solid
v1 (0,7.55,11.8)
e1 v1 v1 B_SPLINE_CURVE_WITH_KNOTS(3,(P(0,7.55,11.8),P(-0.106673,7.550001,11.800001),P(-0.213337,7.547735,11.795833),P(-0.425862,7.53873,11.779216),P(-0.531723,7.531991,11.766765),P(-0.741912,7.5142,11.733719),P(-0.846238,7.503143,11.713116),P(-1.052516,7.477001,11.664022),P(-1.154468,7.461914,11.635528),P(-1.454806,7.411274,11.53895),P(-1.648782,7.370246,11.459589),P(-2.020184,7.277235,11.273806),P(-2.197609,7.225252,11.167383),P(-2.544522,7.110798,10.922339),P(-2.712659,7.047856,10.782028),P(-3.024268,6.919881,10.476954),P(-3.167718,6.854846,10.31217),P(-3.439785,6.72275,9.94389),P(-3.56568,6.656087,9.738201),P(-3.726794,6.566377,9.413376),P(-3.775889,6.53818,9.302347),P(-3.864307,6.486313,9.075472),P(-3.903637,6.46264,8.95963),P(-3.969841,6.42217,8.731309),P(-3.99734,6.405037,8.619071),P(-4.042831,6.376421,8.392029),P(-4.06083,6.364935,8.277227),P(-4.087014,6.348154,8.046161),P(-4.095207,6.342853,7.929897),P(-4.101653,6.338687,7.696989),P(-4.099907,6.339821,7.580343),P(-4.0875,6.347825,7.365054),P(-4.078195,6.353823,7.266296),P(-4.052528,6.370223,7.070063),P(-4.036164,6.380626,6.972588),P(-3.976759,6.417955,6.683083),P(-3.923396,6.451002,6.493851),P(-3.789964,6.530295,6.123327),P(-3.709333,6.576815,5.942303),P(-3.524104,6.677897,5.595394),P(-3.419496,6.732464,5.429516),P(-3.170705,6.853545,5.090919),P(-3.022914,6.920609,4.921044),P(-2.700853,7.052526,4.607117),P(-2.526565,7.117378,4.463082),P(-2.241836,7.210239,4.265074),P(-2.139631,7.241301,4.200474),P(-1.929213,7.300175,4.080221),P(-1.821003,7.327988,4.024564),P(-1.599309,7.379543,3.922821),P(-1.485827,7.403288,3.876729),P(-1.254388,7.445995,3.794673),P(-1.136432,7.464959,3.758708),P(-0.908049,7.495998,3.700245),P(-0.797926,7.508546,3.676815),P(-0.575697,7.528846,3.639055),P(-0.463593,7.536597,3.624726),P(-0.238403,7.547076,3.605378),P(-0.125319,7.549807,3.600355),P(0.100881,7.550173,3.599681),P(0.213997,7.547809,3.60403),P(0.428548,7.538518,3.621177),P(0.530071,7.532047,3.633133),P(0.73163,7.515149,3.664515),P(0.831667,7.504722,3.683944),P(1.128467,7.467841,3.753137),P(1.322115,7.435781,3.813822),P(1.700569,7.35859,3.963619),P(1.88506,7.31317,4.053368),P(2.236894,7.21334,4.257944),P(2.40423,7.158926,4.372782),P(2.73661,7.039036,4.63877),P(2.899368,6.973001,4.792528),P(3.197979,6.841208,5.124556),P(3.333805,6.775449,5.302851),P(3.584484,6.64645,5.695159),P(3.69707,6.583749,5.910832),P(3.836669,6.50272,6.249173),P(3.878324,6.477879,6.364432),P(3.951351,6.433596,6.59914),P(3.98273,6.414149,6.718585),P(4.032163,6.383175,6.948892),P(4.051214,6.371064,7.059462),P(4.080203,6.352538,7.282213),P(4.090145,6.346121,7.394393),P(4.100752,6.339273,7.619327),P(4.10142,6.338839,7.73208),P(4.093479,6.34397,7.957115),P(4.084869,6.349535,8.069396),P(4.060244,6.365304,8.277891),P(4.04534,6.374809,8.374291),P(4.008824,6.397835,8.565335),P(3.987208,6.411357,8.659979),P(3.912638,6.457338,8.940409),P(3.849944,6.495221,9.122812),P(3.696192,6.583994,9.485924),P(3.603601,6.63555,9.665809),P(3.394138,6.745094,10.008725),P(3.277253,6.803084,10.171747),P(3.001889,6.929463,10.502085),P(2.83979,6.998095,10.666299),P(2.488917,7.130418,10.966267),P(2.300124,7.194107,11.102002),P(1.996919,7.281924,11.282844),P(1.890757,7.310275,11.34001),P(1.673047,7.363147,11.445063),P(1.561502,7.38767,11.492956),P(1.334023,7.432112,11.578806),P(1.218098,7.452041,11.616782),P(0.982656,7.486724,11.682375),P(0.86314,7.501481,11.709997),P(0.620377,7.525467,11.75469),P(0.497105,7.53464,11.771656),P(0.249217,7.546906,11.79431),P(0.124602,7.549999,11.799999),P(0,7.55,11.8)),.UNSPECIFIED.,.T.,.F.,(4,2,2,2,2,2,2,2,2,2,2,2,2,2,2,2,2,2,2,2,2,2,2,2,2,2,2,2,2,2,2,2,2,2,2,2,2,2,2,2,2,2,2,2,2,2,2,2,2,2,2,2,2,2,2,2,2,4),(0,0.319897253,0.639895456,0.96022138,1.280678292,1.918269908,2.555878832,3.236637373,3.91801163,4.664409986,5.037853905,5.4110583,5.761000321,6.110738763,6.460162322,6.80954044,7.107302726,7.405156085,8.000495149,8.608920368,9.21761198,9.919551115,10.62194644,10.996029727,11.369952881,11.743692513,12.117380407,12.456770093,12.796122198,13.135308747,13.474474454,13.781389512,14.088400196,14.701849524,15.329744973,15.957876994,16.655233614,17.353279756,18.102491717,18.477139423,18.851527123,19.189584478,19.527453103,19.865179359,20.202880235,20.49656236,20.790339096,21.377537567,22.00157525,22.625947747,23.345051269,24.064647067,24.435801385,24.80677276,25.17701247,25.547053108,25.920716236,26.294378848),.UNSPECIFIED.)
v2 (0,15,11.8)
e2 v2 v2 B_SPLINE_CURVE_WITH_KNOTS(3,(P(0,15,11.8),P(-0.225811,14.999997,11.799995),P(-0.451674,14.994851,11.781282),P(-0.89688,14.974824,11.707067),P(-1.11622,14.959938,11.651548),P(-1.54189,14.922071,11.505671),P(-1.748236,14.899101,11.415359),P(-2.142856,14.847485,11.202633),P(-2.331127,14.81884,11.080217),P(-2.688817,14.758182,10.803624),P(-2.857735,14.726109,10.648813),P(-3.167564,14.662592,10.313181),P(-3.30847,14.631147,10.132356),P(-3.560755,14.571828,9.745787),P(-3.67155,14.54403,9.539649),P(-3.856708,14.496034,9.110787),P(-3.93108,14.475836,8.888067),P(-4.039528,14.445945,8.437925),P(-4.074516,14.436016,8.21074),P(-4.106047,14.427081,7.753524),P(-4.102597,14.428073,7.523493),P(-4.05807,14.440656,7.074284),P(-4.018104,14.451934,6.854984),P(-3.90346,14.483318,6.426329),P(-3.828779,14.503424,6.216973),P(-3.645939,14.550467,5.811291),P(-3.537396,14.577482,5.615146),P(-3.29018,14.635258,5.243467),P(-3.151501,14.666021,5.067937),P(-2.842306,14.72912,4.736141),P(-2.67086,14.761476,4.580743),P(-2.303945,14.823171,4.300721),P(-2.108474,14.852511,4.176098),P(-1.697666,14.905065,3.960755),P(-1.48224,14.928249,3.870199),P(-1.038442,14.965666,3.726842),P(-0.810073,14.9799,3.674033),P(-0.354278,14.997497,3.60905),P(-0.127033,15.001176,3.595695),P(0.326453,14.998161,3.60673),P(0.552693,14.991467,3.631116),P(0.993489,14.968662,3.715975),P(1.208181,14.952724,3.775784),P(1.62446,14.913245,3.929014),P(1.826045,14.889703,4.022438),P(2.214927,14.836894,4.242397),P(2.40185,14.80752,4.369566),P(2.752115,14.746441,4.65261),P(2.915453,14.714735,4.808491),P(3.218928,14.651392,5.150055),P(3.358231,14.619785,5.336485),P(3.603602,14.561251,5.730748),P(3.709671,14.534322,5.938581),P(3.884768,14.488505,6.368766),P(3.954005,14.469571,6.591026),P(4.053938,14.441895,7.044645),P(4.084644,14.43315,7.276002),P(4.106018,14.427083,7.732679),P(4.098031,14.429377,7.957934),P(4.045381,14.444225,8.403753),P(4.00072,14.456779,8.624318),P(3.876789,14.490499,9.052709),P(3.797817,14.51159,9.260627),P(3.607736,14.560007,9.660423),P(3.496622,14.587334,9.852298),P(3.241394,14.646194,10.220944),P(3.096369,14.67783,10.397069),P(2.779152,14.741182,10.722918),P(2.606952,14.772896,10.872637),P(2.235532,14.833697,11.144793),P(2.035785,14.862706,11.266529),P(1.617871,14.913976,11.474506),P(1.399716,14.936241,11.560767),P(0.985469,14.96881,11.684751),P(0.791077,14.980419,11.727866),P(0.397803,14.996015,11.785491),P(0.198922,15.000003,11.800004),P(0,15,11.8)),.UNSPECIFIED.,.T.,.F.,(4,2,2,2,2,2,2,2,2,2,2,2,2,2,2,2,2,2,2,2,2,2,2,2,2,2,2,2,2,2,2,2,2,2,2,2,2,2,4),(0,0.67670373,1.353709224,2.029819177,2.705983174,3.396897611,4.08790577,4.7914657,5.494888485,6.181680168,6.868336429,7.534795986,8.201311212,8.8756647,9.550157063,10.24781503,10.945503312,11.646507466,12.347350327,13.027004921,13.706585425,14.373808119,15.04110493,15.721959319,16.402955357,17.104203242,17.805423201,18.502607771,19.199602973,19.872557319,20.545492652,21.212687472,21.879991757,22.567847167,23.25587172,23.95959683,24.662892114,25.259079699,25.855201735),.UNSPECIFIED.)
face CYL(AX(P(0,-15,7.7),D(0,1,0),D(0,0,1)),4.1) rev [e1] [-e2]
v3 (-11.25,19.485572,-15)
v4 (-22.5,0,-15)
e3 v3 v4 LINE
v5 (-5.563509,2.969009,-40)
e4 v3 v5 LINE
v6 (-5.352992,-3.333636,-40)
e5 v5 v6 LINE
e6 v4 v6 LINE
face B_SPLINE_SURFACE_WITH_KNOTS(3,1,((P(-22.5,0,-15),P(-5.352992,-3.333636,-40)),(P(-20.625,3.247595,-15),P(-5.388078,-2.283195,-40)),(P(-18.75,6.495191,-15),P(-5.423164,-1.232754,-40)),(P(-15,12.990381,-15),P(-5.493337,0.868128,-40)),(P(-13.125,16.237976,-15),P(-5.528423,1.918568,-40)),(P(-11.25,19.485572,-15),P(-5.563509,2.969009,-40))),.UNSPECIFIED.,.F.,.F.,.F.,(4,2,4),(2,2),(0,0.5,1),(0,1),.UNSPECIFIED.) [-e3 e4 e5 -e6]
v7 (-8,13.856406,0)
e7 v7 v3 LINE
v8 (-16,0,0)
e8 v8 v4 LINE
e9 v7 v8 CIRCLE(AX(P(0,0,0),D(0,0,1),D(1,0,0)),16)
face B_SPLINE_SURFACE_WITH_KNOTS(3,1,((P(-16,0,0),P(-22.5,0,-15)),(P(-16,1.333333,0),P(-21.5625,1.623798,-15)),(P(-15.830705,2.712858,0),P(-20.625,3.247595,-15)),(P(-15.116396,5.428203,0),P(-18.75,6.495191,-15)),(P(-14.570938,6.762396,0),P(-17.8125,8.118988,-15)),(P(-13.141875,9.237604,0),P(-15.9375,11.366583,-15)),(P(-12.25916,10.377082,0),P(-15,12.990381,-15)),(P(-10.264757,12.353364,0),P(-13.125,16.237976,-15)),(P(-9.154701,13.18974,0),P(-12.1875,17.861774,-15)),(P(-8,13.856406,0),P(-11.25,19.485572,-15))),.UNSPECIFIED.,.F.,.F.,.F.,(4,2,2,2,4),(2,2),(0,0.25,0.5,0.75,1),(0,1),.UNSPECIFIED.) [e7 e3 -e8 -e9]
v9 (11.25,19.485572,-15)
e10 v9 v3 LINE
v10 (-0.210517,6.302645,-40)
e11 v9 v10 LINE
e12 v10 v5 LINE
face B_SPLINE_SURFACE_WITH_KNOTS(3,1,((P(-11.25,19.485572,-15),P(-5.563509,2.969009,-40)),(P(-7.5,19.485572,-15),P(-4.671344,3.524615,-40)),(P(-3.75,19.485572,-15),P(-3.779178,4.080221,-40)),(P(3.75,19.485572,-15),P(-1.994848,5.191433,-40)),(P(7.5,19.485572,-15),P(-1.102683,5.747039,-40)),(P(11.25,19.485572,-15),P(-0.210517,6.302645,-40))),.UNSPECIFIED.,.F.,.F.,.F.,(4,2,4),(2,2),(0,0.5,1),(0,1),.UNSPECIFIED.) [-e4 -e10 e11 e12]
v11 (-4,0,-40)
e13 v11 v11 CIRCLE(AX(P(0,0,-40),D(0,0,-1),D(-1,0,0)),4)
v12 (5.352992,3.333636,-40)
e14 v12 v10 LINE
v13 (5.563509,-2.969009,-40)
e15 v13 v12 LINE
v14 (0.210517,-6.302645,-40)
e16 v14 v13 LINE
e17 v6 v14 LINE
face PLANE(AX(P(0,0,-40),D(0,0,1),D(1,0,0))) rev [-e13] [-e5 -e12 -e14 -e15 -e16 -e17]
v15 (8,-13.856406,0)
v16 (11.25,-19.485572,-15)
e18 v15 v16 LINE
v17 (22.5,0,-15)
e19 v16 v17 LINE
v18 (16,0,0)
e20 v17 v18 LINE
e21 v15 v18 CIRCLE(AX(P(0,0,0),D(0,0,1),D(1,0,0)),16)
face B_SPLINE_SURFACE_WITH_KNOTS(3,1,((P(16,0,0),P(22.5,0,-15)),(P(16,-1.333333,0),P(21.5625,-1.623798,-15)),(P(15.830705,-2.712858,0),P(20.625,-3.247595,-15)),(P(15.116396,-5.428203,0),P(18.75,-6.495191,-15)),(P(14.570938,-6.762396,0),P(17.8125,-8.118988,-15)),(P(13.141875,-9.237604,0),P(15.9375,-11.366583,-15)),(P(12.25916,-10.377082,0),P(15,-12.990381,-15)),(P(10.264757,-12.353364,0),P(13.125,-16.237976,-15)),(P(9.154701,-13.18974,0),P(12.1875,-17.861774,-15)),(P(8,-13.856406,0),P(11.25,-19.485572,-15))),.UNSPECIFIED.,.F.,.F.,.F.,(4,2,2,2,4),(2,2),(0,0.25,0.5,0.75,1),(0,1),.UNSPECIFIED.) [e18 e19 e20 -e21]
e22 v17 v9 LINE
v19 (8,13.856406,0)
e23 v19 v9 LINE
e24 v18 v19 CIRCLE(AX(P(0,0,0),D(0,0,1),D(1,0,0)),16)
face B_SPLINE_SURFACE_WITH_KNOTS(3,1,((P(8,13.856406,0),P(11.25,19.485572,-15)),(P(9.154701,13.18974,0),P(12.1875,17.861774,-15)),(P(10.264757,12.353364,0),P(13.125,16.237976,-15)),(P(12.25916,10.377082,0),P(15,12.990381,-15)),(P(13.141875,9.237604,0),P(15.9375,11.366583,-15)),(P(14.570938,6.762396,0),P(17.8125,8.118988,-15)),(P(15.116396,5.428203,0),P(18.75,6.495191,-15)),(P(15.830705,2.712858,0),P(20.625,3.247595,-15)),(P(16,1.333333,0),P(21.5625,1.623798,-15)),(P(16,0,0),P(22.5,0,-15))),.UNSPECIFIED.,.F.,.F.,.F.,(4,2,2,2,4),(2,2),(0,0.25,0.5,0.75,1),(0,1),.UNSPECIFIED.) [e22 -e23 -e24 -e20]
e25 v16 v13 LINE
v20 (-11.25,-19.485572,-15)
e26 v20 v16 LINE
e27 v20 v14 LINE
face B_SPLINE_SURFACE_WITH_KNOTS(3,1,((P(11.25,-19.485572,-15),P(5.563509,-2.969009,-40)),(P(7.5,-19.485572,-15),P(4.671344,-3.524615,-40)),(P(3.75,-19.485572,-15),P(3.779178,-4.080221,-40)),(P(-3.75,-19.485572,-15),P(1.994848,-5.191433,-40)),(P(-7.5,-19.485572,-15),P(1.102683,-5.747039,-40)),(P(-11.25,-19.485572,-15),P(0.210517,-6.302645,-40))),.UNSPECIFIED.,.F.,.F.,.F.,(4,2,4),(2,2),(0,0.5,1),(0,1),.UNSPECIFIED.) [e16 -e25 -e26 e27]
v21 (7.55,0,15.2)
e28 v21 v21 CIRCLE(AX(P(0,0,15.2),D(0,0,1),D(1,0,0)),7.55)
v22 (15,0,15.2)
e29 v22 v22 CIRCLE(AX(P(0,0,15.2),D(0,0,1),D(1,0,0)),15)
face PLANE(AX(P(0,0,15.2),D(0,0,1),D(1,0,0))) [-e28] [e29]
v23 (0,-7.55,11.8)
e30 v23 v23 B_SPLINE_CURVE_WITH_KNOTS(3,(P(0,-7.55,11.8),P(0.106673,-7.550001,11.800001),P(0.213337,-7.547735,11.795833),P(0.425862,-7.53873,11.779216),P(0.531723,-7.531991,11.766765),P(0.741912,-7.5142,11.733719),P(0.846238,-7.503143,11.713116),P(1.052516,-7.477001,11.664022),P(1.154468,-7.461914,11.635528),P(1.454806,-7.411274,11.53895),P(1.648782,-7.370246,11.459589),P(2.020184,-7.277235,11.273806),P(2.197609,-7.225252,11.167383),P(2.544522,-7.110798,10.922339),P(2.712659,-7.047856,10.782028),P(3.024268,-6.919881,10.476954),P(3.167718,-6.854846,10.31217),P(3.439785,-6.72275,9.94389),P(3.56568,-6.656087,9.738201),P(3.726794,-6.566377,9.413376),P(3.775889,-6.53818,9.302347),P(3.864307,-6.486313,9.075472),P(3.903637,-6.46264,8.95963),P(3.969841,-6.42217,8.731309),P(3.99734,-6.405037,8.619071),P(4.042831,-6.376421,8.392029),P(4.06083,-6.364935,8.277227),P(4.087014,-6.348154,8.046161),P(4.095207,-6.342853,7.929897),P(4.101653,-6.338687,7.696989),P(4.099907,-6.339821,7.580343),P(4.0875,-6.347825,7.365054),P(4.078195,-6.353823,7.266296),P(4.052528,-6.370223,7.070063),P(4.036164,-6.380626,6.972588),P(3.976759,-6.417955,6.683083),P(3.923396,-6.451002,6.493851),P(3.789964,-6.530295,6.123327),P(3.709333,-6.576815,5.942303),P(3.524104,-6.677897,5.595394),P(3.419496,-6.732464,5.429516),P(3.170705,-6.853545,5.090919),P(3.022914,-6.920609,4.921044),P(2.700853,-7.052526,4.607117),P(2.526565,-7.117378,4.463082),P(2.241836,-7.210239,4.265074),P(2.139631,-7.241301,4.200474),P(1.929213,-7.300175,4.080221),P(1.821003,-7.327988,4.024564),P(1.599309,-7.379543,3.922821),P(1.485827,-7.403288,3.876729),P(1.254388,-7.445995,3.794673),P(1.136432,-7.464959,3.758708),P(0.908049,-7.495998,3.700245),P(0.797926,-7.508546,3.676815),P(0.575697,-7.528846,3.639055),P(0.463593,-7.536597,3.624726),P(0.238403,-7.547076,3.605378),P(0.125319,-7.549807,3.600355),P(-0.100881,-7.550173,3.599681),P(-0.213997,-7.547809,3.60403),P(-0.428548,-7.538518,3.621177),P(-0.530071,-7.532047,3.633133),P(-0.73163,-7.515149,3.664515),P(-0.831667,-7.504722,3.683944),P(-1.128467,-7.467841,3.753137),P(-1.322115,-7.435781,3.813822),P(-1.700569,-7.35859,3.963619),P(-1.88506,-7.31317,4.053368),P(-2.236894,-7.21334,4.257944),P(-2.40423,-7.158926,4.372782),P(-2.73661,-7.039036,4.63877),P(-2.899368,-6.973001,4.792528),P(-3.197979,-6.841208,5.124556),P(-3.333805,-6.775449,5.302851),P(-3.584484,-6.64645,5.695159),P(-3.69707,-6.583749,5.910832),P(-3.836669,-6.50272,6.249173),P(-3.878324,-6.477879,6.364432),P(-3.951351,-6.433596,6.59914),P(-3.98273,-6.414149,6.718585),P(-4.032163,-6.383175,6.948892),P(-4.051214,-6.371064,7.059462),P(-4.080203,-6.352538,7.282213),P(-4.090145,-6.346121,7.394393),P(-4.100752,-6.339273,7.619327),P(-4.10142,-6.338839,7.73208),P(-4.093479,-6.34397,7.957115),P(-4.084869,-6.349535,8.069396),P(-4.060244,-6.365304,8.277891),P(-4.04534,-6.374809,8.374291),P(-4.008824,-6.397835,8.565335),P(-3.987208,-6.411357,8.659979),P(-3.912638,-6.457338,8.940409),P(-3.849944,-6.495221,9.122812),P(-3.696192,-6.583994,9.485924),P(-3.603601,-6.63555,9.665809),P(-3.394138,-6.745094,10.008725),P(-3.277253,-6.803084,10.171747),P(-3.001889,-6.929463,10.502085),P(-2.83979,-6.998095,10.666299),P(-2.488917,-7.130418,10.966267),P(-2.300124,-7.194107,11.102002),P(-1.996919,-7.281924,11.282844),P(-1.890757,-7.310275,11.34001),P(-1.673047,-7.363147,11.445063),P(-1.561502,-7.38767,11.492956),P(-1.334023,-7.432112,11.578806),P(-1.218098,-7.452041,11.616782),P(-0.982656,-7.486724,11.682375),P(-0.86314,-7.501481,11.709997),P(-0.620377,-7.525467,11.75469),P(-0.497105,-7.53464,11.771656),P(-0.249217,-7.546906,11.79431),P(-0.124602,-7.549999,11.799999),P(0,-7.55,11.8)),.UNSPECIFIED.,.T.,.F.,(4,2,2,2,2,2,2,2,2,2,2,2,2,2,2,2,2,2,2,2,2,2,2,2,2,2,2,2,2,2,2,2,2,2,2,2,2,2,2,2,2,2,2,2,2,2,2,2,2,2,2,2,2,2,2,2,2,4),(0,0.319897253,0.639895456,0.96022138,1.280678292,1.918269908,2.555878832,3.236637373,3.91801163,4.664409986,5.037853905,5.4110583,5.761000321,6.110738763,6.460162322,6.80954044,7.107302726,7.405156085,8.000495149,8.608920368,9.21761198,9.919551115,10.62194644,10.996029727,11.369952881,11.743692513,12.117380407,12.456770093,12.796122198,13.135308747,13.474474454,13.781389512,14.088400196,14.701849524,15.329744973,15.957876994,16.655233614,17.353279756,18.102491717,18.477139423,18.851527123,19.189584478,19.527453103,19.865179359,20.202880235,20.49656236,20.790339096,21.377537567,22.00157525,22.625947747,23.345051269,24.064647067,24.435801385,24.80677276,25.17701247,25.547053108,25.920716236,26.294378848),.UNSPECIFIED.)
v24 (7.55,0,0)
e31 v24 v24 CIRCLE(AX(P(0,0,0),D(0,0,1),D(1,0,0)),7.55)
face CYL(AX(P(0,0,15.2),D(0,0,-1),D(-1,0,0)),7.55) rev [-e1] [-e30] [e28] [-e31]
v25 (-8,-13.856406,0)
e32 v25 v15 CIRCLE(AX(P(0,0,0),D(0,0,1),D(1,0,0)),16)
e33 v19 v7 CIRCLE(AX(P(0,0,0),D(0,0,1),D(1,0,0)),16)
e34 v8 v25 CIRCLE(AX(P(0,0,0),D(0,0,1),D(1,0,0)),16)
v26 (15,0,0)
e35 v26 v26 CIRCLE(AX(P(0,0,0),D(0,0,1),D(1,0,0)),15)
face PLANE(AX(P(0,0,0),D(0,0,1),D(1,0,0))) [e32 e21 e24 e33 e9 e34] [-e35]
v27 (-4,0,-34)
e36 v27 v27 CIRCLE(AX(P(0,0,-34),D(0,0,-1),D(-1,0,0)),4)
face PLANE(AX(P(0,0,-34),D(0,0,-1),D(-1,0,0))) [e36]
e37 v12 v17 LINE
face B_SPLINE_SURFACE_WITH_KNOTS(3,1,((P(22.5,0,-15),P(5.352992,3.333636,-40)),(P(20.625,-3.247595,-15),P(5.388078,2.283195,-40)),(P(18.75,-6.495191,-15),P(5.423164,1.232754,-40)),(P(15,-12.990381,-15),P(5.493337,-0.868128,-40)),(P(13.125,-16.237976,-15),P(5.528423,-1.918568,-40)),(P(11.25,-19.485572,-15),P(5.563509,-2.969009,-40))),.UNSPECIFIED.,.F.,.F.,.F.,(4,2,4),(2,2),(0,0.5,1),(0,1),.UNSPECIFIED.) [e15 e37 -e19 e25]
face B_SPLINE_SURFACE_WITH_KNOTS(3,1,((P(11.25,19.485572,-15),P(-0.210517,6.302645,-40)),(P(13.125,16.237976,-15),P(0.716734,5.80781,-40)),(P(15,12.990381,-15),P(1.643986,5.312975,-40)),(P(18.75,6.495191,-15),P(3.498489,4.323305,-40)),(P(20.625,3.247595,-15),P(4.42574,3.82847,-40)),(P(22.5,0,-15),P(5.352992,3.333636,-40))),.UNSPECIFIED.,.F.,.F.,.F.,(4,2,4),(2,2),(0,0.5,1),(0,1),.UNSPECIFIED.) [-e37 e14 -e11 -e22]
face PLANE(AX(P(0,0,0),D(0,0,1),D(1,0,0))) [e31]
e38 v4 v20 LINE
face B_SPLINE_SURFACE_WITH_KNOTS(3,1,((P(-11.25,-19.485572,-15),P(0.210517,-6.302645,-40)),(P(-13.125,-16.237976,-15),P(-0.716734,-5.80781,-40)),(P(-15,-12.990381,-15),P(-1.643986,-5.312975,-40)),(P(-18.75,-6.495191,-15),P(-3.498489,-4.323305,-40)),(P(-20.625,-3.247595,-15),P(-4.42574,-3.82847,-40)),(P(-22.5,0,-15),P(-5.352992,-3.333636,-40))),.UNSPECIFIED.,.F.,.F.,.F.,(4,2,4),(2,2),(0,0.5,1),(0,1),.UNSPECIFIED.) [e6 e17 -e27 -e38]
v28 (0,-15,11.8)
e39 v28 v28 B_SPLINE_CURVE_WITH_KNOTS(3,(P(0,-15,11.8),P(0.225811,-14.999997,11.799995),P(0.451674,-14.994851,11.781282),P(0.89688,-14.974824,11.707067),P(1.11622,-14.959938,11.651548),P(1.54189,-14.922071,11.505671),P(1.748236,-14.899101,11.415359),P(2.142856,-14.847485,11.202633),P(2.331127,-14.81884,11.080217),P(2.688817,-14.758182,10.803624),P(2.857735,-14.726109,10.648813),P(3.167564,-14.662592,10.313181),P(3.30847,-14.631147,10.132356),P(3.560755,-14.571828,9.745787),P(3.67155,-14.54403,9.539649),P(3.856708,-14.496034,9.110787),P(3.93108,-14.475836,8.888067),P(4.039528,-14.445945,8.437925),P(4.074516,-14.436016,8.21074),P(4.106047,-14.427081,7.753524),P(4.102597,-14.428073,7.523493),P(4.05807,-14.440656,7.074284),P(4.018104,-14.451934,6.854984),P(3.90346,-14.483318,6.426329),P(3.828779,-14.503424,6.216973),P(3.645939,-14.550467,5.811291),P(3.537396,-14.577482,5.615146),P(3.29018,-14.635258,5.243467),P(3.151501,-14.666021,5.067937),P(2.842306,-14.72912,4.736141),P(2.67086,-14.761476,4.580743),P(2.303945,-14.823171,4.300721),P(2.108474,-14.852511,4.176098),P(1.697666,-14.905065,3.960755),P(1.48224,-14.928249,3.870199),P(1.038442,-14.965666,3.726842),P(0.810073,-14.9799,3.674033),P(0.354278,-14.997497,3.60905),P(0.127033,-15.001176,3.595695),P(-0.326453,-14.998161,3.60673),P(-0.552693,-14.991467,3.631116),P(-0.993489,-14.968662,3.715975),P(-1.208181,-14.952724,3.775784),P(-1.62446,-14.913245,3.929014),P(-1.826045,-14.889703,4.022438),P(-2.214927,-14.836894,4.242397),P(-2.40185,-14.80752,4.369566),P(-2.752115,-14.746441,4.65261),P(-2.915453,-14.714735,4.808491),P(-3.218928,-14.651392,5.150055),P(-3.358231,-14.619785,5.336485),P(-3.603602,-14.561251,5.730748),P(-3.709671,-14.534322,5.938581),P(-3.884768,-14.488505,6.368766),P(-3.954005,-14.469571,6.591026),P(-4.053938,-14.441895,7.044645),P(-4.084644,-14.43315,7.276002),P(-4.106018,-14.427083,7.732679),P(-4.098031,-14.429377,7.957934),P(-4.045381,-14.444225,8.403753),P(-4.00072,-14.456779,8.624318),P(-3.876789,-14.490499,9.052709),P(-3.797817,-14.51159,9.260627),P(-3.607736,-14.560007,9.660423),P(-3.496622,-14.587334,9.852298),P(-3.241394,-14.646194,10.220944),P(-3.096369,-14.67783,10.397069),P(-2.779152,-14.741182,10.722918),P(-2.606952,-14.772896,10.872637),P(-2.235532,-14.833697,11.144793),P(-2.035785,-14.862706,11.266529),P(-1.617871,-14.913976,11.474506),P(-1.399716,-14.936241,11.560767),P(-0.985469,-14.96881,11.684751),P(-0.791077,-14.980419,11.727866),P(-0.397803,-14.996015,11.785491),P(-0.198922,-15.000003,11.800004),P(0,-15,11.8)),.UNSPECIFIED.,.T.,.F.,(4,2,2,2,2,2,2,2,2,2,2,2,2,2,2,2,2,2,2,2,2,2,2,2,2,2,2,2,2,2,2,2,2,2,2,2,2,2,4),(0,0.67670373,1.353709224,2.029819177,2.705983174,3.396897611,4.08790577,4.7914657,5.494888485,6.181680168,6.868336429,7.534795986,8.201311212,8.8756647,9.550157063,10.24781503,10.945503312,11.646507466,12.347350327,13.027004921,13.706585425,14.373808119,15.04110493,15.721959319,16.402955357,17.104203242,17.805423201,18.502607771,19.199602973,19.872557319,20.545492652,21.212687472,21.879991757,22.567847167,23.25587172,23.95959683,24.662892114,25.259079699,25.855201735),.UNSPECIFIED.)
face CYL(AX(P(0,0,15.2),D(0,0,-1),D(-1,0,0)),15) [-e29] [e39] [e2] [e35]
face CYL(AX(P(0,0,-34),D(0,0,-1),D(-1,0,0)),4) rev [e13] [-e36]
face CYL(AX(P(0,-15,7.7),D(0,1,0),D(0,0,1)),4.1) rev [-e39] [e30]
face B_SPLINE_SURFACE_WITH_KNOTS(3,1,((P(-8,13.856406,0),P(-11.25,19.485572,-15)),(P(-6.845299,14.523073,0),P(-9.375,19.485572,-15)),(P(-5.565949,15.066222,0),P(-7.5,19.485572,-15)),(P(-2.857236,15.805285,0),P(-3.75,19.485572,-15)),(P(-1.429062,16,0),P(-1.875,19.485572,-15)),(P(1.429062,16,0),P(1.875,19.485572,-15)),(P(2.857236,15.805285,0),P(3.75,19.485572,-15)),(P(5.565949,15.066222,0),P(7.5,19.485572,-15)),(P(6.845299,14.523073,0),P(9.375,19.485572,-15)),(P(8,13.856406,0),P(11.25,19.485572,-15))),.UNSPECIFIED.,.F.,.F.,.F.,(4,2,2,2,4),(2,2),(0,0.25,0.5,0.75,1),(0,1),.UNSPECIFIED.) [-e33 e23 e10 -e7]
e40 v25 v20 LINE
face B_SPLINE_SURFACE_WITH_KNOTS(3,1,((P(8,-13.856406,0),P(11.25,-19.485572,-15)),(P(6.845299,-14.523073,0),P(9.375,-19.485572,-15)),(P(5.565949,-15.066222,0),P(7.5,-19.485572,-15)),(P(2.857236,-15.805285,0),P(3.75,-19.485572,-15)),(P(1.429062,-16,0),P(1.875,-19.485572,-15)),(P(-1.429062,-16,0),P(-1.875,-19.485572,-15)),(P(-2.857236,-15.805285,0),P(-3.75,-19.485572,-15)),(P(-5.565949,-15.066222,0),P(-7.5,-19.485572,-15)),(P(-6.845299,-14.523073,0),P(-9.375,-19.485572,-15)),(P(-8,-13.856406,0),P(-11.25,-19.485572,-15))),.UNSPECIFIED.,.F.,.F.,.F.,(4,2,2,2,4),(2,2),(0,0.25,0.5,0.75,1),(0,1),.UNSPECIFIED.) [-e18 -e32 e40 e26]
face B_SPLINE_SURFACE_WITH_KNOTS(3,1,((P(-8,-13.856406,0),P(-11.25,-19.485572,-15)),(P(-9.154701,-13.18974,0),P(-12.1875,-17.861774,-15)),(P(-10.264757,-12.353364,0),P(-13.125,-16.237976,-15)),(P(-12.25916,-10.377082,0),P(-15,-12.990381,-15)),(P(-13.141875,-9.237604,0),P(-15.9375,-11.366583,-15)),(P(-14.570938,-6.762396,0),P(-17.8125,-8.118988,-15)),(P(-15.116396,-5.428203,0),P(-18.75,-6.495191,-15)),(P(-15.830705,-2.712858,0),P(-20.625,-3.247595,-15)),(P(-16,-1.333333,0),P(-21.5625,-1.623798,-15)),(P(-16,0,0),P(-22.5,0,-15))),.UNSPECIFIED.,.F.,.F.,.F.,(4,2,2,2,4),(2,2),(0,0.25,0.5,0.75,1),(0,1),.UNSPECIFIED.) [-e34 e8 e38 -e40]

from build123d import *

# Parameters (mm, degrees)
SKETCH_1_R               = 15
SKETCH_1_R_2             = 7.55
EXTRUDE_1_DEPTH          = 15.2
CUT_EXTRUDE_1_DEPTH      = 27.096743092
CUT_EXTRUDE_1_DEPTH_BACK = 27.096743092
SKETCH_2_R               = 4.1
SKETCH_8_R               = 4
CUT_EXTRUDE_2_DEPTH      = 6


with BuildPart() as part:
    # 스케치1 → 보스-돌출1 (new body)
    with BuildSketch(Plane.XY):
        with Locations(Location((0, 0, 0), (0, 0, 180))):
            Circle(SKETCH_1_R)
        with Locations(Location((0, 0, 0), (0, 0, 180))):
            Circle(SKETCH_1_R_2, mode=Mode.SUBTRACT)
    extrude(amount=EXTRUDE_1_DEPTH)

    # 스케치2 → 컷-돌출1 (cut, two sides: drawn at the far end of the back side and taken through both)
    with BuildSketch(Plane(origin=(0, 0, 0), x_dir=(1, 0, 0), z_dir=(0, 1, 0)).offset(-CUT_EXTRUDE_1_DEPTH_BACK)):
        with Locations(Location((0, -7.7, 0), (0, 0, 270))):
            Circle(SKETCH_2_R)
    extrude(amount=CUT_EXTRUDE_1_DEPTH + CUT_EXTRUDE_1_DEPTH_BACK, mode=Mode.SUBTRACT)

    # 스케치3 for 로프트4 → 로프트4 section 0
    with BuildSketch(Plane.XY):
        with BuildLine():
            # circular arc as an exact rational Bezier (weights 1, cos(half-angle), 1)
            Bezier((8, -13.856406461), (16.000000001, -9.237604308), (16, 0), weights=[1, 0.866025404, 1])
            Bezier((16, 0), (16.000000001, 9.237604308), (8, 13.856406461), weights=[1, 0.866025404, 1])
            Bezier((8, 13.856406461), (0, 18.475208613), (-8, 13.856406461), weights=[1, 0.866025404, 1])
            Bezier((-8, 13.856406461), (-16.000000001, 9.237604308), (-16, 0), weights=[1, 0.866025404, 1])
            Bezier((-16, 0), (-16.000000001, -9.237604308), (-8, -13.856406461), weights=[1, 0.866025404, 1])
            Bezier((-8, -13.856406461), (0, -18.475208613), (8, -13.856406461), weights=[1, 0.866025404, 1])
        make_face()
    # 스케치4 → 로프트4 section 1
    with BuildSketch(Plane.XY.offset(-15)):
        with BuildLine():
            Line((11.25, -19.485571585), (22.5, 0))
            Line((22.5, 0), (11.25, 19.485571585))
            Line((11.25, 19.485571585), (-11.25, 19.485571585))
            Line((-11.25, 19.485571585), (-22.5, 0))
            Line((-22.5, 0), (-11.25, -19.485571585))
            Line((-11.25, -19.485571585), (11.25, -19.485571585))
        make_face()
    loft()

    # 로프트5: read off the stored shape, not the designer's step
    # 로프트5: loft between two sections, ruled curve by curve
    loft_5_from = [
        Edge.make_bspline([(22.5, 0, -15), (20.625, -3.247595264, -15), (18.75, -6.495190528, -15), (15, -12.990381057, -15), (13.125, -16.237976321, -15), (11.25, -19.485571585, -15)], [0, 0, 0, 0, 0.5, 0.5, 1, 1, 1, 1], 3),
        Edge.make_bspline([(11.25, -19.485571585, -15), (7.5, -19.485571585, -15), (3.75, -19.485571585, -15), (-3.75, -19.485571585, -15), (-7.5, -19.485571585, -15), (-11.25, -19.485571585, -15)], [0, 0, 0, 0, 0.5, 0.5, 1, 1, 1, 1], 3),
        Edge.make_bspline([(11.25, 19.485571585, -15), (13.125, 16.237976321, -15), (15, 12.990381057, -15), (18.75, 6.495190528, -15), (20.625, 3.247595264, -15), (22.5, 0, -15)], [0, 0, 0, 0, 0.5, 0.5, 1, 1, 1, 1], 3),
        Edge.make_bspline([(-11.25, -19.485571585, -15), (-13.125, -16.237976321, -15), (-15, -12.990381057, -15), (-18.75, -6.495190528, -15), (-20.625, -3.247595264, -15), (-22.5, 0, -15)], [0, 0, 0, 0, 0.5, 0.5, 1, 1, 1, 1], 3),
        Edge.make_bspline([(-22.5, 0, -15), (-20.625, 3.247595264, -15), (-18.75, 6.495190528, -15), (-15, 12.990381057, -15), (-13.125, 16.237976321, -15), (-11.25, 19.485571585, -15)], [0, 0, 0, 0, 0.5, 0.5, 1, 1, 1, 1], 3),
        Edge.make_bspline([(-11.25, 19.485571585, -15), (-7.5, 19.485571585, -15), (-3.75, 19.485571585, -15), (3.75, 19.485571585, -15), (7.5, 19.485571585, -15), (11.25, 19.485571585, -15)], [0, 0, 0, 0, 0.5, 0.5, 1, 1, 1, 1], 3),
    ]
    loft_5_to = [
        Edge.make_bspline([(5.352991825, 3.333635602, -40), (5.388078026, 2.283194817, -40), (5.423164227, 1.232754033, -40), (5.493336629, -0.868127536, -40), (5.52842283, -1.918568321, -40), (5.563509031, -2.969009106, -40)], [0, 0, 0, 0, 0.5, 0.5, 1, 1, 1, 1], 3),
        Edge.make_bspline([(5.563509031, -2.969009106, -40), (4.671343726, -3.524615039, -40), (3.779178422, -4.080220973, -40), (1.994847814, -5.19143284, -40), (1.10268251, -5.747038774, -40), (0.210517206, -6.302644707, -40)], [0, 0, 0, 0, 0.5, 0.5, 1, 1, 1, 1], 3),
        Edge.make_bspline([(-0.210517206, 6.302644707, -40), (0.716734299, 5.807809856, -40), (1.643985804, 5.312975006, -40), (3.498488815, 4.323305304, -40), (4.42574032, 3.828470453, -40), (5.352991825, 3.333635602, -40)], [0, 0, 0, 0, 0.5, 0.5, 1, 1, 1, 1], 3),
        Edge.make_bspline([(0.210517206, -6.302644707, -40), (-0.716734299, -5.807809856, -40), (-1.643985804, -5.312975006, -40), (-3.498488815, -4.323305304, -40), (-4.42574032, -3.828470453, -40), (-5.352991825, -3.333635602, -40)], [0, 0, 0, 0, 0.5, 0.5, 1, 1, 1, 1], 3),
        Edge.make_bspline([(-5.352991825, -3.333635602, -40), (-5.388078026, -2.283194817, -40), (-5.423164227, -1.232754033, -40), (-5.493336629, 0.868127536, -40), (-5.52842283, 1.918568321, -40), (-5.563509031, 2.969009106, -40)], [0, 0, 0, 0, 0.5, 0.5, 1, 1, 1, 1], 3),
        Edge.make_bspline([(-5.563509031, 2.969009106, -40), (-4.671343726, 3.524615039, -40), (-3.779178422, 4.080220973, -40), (-1.994847814, 5.19143284, -40), (-1.10268251, 5.747038774, -40), (-0.210517206, 6.302644707, -40)], [0, 0, 0, 0, 0.5, 0.5, 1, 1, 1, 1], 3),
    ]
    loft_5 = Solid(Shell([*[Face.make_surface_from_curves(loft_5_from[k], loft_5_to[k]) for k in range(6)], Face(Wire(loft_5_from)), Face(Wire(loft_5_to))]))
    add(loft_5)

    # 스케치8 → 컷-돌출2 (cut)
    with BuildSketch(Plane(origin=(0, 0, -40), x_dir=(-1, 0, 0), z_dir=(0, 0, -1))):
        Circle(SKETCH_8_R)
    extrude(amount=-CUT_EXTRUDE_2_DEPTH, mode=Mode.SUBTRACT)


solid = part.part
